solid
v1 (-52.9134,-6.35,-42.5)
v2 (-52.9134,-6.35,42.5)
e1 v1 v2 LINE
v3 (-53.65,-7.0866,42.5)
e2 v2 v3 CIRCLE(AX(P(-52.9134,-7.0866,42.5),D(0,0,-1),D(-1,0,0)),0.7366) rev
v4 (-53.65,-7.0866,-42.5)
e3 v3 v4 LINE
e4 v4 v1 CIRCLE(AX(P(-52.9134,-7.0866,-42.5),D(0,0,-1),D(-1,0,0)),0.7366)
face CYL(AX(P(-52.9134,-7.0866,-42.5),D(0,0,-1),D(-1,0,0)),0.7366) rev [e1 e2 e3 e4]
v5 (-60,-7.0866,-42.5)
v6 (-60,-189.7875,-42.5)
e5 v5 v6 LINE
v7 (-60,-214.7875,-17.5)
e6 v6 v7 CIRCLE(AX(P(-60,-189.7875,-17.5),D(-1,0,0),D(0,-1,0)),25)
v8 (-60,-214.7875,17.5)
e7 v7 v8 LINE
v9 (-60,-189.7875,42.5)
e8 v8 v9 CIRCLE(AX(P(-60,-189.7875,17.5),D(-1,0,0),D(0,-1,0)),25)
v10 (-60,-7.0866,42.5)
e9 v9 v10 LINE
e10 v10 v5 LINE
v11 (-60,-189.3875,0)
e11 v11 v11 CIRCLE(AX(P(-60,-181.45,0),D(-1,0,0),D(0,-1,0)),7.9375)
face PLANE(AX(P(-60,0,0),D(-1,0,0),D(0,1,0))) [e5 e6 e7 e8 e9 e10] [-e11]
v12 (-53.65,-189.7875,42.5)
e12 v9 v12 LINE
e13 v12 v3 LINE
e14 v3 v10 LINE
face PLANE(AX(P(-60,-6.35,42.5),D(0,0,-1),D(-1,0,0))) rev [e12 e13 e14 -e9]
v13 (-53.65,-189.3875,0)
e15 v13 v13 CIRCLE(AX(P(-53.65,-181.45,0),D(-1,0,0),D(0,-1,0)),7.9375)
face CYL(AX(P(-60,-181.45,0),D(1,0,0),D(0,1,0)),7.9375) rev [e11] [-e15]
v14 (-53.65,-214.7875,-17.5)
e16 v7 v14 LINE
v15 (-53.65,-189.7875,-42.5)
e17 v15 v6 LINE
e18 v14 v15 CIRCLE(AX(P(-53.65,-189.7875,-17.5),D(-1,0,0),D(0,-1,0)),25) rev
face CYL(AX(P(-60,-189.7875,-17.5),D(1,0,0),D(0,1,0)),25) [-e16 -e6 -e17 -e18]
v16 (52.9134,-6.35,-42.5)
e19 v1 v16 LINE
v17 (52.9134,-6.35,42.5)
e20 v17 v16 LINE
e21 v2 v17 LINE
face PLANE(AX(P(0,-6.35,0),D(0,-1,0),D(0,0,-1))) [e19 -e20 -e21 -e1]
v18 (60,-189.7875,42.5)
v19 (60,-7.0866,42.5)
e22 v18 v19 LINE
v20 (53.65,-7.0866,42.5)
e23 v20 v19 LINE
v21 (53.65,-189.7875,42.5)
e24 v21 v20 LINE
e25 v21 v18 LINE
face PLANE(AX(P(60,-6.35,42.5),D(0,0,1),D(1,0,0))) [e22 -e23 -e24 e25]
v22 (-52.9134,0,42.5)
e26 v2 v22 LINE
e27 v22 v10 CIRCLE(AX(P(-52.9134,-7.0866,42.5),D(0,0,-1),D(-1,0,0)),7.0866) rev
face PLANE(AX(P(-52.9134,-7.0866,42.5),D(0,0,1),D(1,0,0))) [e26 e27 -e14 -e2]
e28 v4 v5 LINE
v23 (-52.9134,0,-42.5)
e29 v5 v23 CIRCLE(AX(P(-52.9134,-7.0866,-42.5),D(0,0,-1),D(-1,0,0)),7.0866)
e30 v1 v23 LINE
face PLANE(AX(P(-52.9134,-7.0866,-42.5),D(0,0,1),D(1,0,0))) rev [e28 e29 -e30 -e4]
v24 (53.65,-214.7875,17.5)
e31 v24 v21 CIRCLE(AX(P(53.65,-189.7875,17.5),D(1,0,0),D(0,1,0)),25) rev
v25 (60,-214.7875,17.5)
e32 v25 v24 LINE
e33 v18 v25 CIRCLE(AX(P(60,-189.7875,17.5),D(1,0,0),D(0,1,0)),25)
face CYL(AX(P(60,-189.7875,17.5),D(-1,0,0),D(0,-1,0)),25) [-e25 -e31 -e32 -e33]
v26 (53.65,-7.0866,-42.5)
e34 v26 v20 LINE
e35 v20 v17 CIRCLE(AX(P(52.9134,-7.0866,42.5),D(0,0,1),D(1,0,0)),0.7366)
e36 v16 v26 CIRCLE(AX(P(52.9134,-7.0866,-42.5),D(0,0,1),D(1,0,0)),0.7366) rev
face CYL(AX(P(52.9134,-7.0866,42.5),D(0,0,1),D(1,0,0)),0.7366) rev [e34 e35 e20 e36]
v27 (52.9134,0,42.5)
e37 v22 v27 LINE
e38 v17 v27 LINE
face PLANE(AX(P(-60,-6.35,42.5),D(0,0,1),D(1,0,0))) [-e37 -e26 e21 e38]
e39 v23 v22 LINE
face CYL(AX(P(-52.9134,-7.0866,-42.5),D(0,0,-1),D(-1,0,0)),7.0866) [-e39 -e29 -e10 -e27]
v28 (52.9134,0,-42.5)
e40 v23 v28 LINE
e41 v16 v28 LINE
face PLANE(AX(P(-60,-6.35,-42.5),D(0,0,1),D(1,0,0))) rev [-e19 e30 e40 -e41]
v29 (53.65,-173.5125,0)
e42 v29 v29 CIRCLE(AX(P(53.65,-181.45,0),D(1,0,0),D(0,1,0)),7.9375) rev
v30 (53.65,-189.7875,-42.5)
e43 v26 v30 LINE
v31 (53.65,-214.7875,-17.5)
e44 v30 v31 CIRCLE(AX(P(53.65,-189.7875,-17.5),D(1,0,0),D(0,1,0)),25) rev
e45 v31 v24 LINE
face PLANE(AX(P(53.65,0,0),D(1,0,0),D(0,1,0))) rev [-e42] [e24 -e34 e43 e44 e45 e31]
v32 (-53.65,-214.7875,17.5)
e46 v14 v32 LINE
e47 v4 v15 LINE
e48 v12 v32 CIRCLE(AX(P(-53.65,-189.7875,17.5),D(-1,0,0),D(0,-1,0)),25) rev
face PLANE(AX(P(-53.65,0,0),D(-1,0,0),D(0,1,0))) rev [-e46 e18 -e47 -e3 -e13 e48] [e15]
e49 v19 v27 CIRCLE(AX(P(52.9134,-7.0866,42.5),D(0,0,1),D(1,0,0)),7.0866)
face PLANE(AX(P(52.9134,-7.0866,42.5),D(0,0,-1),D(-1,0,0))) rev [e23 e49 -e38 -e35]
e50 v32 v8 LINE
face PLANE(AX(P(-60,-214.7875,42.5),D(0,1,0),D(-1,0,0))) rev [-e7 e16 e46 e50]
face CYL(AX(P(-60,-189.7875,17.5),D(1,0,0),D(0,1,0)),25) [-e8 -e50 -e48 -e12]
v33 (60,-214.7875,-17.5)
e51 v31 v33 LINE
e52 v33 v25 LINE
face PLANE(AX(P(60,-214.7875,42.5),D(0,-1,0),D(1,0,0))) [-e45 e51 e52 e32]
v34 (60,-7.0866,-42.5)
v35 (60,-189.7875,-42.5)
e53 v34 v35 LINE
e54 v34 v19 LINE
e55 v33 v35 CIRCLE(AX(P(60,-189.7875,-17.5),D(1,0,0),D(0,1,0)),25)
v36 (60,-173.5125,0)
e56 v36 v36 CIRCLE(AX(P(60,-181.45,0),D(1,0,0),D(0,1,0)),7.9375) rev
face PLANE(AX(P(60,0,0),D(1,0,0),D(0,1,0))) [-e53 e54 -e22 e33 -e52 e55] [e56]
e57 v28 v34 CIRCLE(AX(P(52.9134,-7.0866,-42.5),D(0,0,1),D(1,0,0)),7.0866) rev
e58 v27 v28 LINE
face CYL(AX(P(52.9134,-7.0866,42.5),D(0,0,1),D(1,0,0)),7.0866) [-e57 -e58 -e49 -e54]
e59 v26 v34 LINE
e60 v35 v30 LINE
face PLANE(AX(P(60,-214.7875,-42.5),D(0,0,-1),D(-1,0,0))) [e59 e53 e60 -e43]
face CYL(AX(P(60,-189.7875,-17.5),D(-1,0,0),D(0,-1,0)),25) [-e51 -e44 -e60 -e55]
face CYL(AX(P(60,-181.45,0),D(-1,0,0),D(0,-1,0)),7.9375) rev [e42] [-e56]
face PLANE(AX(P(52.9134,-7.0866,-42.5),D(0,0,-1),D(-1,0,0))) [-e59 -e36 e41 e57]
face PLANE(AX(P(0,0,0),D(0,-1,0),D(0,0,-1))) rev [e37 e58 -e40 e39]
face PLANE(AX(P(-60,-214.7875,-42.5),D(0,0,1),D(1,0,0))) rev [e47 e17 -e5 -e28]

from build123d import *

# Parameters (mm, degrees)
SKETCH3_W                    = 120
SKETCH3_H                    = 85
BASE_FLANGE1_DEPTH           = 6.35
EDGE_FLANGE1_STRIP_W         = 26.8732
EDGE_FLANGE1_STRIP_H         = 6.35
EDGE_FLANGE1_STRIP_CUT_DEPTH = 85
EDGE_FLANGE1_DEPTH           = 85
EDGE_FLANGE1_PROFILE_W       = 85
EDGE_FLANGE1_PROFILE_H       = 207.7009
EDGE_FLANGE1_PROFILE_R       = 7.9375
EDGE_FLANGE1_FLAT_DEPTH      = 6.35
FILLET1_R                    = 25


# Sheet-metal steps are written as plain solids
with BuildPart() as part:
    # Sketch3 → Base-Flange1 (new body)
    with BuildSketch(Plane(origin=(0, 0, 0), x_dir=(1, 0, 0), z_dir=(0, 1, 0))):
        Rectangle(SKETCH3_W, SKETCH3_H)
    extrude(amount=-BASE_FLANGE1_DEPTH)

    # Edge-Flange1 strip (across the edge) → Edge-Flange1 strip cut (cut)
    with BuildSketch(Plane(origin=(60, -6.35, -42.5), x_dir=(-1, 0, 0), z_dir=(0, 0, 1))):
        with Locations((-6.35, -3.175)):
            Rectangle(EDGE_FLANGE1_STRIP_W, EDGE_FLANGE1_STRIP_H)
    edge_flange1_strip_cut = extrude(amount=EDGE_FLANGE1_STRIP_CUT_DEPTH, mode=Mode.SUBTRACT)

    # Edge-Flange1 bend section (across the edge) → Edge-Flange1 (add)
    with BuildSketch(Plane(origin=(60, -6.35, -42.5), x_dir=(-1, 0, 0), z_dir=(0, 0, 1))):
        with BuildLine():
            Line((0, 0.7366), (6.35, 0.7366))
            ThreePointArc((6.35, 0.7366), (6.565745145, 0.215745145), (7.0866, 0))
            Line((7.0866, 0), (7.0866, -6.35))
            ThreePointArc((7.0866, -6.35), (2.075617084, -4.274382916), (0, 0.7366))
        make_face()
    edge_flange1 = extrude(amount=EDGE_FLANGE1_DEPTH)

    # Edge-Flange1 profile (on flange) → Edge-Flange1 flat (add)
    with BuildSketch(Plane(origin=(60, -6.35, 0), x_dir=(0, 0, -1), z_dir=(-1, 0, 0))):
        with Locations((0, 104.58705)):
            Rectangle(EDGE_FLANGE1_PROFILE_W, EDGE_FLANGE1_PROFILE_H)
        with Locations((0, 175.1)):
            Circle(EDGE_FLANGE1_PROFILE_R, mode=Mode.SUBTRACT)
    edge_flange1_flat = extrude(amount=EDGE_FLANGE1_FLAT_DEPTH)

    # Mirror1: Edge-Flange1 strip cut, Edge-Flange1, Edge-Flange1 flat across plane
    add(edge_flange1_strip_cut.mirror(Plane(origin=(0, 0, 0), x_dir=(0, 0, 1), z_dir=(1, 0, 0))), mode=Mode.SUBTRACT)
    add(edge_flange1.mirror(Plane(origin=(0, 0, 0), x_dir=(0, 0, 1), z_dir=(1, 0, 0))))
    add(edge_flange1_flat.mirror(Plane(origin=(0, 0, 0), x_dir=(0, 0, 1), z_dir=(1, 0, 0))))

    # Fillet1
    fillet1_edges = [part.edges().sort_by_distance(p)[0] for p in [
        (56.825, -214.7875, -42.5),
        (56.825, -214.7875, 42.5),
        (-56.825, -214.7875, 42.5),
        (-56.825, -214.7875, -42.5),
    ]]
    fillet(fillet1_edges, radius=FILLET1_R)


solid = part.part
